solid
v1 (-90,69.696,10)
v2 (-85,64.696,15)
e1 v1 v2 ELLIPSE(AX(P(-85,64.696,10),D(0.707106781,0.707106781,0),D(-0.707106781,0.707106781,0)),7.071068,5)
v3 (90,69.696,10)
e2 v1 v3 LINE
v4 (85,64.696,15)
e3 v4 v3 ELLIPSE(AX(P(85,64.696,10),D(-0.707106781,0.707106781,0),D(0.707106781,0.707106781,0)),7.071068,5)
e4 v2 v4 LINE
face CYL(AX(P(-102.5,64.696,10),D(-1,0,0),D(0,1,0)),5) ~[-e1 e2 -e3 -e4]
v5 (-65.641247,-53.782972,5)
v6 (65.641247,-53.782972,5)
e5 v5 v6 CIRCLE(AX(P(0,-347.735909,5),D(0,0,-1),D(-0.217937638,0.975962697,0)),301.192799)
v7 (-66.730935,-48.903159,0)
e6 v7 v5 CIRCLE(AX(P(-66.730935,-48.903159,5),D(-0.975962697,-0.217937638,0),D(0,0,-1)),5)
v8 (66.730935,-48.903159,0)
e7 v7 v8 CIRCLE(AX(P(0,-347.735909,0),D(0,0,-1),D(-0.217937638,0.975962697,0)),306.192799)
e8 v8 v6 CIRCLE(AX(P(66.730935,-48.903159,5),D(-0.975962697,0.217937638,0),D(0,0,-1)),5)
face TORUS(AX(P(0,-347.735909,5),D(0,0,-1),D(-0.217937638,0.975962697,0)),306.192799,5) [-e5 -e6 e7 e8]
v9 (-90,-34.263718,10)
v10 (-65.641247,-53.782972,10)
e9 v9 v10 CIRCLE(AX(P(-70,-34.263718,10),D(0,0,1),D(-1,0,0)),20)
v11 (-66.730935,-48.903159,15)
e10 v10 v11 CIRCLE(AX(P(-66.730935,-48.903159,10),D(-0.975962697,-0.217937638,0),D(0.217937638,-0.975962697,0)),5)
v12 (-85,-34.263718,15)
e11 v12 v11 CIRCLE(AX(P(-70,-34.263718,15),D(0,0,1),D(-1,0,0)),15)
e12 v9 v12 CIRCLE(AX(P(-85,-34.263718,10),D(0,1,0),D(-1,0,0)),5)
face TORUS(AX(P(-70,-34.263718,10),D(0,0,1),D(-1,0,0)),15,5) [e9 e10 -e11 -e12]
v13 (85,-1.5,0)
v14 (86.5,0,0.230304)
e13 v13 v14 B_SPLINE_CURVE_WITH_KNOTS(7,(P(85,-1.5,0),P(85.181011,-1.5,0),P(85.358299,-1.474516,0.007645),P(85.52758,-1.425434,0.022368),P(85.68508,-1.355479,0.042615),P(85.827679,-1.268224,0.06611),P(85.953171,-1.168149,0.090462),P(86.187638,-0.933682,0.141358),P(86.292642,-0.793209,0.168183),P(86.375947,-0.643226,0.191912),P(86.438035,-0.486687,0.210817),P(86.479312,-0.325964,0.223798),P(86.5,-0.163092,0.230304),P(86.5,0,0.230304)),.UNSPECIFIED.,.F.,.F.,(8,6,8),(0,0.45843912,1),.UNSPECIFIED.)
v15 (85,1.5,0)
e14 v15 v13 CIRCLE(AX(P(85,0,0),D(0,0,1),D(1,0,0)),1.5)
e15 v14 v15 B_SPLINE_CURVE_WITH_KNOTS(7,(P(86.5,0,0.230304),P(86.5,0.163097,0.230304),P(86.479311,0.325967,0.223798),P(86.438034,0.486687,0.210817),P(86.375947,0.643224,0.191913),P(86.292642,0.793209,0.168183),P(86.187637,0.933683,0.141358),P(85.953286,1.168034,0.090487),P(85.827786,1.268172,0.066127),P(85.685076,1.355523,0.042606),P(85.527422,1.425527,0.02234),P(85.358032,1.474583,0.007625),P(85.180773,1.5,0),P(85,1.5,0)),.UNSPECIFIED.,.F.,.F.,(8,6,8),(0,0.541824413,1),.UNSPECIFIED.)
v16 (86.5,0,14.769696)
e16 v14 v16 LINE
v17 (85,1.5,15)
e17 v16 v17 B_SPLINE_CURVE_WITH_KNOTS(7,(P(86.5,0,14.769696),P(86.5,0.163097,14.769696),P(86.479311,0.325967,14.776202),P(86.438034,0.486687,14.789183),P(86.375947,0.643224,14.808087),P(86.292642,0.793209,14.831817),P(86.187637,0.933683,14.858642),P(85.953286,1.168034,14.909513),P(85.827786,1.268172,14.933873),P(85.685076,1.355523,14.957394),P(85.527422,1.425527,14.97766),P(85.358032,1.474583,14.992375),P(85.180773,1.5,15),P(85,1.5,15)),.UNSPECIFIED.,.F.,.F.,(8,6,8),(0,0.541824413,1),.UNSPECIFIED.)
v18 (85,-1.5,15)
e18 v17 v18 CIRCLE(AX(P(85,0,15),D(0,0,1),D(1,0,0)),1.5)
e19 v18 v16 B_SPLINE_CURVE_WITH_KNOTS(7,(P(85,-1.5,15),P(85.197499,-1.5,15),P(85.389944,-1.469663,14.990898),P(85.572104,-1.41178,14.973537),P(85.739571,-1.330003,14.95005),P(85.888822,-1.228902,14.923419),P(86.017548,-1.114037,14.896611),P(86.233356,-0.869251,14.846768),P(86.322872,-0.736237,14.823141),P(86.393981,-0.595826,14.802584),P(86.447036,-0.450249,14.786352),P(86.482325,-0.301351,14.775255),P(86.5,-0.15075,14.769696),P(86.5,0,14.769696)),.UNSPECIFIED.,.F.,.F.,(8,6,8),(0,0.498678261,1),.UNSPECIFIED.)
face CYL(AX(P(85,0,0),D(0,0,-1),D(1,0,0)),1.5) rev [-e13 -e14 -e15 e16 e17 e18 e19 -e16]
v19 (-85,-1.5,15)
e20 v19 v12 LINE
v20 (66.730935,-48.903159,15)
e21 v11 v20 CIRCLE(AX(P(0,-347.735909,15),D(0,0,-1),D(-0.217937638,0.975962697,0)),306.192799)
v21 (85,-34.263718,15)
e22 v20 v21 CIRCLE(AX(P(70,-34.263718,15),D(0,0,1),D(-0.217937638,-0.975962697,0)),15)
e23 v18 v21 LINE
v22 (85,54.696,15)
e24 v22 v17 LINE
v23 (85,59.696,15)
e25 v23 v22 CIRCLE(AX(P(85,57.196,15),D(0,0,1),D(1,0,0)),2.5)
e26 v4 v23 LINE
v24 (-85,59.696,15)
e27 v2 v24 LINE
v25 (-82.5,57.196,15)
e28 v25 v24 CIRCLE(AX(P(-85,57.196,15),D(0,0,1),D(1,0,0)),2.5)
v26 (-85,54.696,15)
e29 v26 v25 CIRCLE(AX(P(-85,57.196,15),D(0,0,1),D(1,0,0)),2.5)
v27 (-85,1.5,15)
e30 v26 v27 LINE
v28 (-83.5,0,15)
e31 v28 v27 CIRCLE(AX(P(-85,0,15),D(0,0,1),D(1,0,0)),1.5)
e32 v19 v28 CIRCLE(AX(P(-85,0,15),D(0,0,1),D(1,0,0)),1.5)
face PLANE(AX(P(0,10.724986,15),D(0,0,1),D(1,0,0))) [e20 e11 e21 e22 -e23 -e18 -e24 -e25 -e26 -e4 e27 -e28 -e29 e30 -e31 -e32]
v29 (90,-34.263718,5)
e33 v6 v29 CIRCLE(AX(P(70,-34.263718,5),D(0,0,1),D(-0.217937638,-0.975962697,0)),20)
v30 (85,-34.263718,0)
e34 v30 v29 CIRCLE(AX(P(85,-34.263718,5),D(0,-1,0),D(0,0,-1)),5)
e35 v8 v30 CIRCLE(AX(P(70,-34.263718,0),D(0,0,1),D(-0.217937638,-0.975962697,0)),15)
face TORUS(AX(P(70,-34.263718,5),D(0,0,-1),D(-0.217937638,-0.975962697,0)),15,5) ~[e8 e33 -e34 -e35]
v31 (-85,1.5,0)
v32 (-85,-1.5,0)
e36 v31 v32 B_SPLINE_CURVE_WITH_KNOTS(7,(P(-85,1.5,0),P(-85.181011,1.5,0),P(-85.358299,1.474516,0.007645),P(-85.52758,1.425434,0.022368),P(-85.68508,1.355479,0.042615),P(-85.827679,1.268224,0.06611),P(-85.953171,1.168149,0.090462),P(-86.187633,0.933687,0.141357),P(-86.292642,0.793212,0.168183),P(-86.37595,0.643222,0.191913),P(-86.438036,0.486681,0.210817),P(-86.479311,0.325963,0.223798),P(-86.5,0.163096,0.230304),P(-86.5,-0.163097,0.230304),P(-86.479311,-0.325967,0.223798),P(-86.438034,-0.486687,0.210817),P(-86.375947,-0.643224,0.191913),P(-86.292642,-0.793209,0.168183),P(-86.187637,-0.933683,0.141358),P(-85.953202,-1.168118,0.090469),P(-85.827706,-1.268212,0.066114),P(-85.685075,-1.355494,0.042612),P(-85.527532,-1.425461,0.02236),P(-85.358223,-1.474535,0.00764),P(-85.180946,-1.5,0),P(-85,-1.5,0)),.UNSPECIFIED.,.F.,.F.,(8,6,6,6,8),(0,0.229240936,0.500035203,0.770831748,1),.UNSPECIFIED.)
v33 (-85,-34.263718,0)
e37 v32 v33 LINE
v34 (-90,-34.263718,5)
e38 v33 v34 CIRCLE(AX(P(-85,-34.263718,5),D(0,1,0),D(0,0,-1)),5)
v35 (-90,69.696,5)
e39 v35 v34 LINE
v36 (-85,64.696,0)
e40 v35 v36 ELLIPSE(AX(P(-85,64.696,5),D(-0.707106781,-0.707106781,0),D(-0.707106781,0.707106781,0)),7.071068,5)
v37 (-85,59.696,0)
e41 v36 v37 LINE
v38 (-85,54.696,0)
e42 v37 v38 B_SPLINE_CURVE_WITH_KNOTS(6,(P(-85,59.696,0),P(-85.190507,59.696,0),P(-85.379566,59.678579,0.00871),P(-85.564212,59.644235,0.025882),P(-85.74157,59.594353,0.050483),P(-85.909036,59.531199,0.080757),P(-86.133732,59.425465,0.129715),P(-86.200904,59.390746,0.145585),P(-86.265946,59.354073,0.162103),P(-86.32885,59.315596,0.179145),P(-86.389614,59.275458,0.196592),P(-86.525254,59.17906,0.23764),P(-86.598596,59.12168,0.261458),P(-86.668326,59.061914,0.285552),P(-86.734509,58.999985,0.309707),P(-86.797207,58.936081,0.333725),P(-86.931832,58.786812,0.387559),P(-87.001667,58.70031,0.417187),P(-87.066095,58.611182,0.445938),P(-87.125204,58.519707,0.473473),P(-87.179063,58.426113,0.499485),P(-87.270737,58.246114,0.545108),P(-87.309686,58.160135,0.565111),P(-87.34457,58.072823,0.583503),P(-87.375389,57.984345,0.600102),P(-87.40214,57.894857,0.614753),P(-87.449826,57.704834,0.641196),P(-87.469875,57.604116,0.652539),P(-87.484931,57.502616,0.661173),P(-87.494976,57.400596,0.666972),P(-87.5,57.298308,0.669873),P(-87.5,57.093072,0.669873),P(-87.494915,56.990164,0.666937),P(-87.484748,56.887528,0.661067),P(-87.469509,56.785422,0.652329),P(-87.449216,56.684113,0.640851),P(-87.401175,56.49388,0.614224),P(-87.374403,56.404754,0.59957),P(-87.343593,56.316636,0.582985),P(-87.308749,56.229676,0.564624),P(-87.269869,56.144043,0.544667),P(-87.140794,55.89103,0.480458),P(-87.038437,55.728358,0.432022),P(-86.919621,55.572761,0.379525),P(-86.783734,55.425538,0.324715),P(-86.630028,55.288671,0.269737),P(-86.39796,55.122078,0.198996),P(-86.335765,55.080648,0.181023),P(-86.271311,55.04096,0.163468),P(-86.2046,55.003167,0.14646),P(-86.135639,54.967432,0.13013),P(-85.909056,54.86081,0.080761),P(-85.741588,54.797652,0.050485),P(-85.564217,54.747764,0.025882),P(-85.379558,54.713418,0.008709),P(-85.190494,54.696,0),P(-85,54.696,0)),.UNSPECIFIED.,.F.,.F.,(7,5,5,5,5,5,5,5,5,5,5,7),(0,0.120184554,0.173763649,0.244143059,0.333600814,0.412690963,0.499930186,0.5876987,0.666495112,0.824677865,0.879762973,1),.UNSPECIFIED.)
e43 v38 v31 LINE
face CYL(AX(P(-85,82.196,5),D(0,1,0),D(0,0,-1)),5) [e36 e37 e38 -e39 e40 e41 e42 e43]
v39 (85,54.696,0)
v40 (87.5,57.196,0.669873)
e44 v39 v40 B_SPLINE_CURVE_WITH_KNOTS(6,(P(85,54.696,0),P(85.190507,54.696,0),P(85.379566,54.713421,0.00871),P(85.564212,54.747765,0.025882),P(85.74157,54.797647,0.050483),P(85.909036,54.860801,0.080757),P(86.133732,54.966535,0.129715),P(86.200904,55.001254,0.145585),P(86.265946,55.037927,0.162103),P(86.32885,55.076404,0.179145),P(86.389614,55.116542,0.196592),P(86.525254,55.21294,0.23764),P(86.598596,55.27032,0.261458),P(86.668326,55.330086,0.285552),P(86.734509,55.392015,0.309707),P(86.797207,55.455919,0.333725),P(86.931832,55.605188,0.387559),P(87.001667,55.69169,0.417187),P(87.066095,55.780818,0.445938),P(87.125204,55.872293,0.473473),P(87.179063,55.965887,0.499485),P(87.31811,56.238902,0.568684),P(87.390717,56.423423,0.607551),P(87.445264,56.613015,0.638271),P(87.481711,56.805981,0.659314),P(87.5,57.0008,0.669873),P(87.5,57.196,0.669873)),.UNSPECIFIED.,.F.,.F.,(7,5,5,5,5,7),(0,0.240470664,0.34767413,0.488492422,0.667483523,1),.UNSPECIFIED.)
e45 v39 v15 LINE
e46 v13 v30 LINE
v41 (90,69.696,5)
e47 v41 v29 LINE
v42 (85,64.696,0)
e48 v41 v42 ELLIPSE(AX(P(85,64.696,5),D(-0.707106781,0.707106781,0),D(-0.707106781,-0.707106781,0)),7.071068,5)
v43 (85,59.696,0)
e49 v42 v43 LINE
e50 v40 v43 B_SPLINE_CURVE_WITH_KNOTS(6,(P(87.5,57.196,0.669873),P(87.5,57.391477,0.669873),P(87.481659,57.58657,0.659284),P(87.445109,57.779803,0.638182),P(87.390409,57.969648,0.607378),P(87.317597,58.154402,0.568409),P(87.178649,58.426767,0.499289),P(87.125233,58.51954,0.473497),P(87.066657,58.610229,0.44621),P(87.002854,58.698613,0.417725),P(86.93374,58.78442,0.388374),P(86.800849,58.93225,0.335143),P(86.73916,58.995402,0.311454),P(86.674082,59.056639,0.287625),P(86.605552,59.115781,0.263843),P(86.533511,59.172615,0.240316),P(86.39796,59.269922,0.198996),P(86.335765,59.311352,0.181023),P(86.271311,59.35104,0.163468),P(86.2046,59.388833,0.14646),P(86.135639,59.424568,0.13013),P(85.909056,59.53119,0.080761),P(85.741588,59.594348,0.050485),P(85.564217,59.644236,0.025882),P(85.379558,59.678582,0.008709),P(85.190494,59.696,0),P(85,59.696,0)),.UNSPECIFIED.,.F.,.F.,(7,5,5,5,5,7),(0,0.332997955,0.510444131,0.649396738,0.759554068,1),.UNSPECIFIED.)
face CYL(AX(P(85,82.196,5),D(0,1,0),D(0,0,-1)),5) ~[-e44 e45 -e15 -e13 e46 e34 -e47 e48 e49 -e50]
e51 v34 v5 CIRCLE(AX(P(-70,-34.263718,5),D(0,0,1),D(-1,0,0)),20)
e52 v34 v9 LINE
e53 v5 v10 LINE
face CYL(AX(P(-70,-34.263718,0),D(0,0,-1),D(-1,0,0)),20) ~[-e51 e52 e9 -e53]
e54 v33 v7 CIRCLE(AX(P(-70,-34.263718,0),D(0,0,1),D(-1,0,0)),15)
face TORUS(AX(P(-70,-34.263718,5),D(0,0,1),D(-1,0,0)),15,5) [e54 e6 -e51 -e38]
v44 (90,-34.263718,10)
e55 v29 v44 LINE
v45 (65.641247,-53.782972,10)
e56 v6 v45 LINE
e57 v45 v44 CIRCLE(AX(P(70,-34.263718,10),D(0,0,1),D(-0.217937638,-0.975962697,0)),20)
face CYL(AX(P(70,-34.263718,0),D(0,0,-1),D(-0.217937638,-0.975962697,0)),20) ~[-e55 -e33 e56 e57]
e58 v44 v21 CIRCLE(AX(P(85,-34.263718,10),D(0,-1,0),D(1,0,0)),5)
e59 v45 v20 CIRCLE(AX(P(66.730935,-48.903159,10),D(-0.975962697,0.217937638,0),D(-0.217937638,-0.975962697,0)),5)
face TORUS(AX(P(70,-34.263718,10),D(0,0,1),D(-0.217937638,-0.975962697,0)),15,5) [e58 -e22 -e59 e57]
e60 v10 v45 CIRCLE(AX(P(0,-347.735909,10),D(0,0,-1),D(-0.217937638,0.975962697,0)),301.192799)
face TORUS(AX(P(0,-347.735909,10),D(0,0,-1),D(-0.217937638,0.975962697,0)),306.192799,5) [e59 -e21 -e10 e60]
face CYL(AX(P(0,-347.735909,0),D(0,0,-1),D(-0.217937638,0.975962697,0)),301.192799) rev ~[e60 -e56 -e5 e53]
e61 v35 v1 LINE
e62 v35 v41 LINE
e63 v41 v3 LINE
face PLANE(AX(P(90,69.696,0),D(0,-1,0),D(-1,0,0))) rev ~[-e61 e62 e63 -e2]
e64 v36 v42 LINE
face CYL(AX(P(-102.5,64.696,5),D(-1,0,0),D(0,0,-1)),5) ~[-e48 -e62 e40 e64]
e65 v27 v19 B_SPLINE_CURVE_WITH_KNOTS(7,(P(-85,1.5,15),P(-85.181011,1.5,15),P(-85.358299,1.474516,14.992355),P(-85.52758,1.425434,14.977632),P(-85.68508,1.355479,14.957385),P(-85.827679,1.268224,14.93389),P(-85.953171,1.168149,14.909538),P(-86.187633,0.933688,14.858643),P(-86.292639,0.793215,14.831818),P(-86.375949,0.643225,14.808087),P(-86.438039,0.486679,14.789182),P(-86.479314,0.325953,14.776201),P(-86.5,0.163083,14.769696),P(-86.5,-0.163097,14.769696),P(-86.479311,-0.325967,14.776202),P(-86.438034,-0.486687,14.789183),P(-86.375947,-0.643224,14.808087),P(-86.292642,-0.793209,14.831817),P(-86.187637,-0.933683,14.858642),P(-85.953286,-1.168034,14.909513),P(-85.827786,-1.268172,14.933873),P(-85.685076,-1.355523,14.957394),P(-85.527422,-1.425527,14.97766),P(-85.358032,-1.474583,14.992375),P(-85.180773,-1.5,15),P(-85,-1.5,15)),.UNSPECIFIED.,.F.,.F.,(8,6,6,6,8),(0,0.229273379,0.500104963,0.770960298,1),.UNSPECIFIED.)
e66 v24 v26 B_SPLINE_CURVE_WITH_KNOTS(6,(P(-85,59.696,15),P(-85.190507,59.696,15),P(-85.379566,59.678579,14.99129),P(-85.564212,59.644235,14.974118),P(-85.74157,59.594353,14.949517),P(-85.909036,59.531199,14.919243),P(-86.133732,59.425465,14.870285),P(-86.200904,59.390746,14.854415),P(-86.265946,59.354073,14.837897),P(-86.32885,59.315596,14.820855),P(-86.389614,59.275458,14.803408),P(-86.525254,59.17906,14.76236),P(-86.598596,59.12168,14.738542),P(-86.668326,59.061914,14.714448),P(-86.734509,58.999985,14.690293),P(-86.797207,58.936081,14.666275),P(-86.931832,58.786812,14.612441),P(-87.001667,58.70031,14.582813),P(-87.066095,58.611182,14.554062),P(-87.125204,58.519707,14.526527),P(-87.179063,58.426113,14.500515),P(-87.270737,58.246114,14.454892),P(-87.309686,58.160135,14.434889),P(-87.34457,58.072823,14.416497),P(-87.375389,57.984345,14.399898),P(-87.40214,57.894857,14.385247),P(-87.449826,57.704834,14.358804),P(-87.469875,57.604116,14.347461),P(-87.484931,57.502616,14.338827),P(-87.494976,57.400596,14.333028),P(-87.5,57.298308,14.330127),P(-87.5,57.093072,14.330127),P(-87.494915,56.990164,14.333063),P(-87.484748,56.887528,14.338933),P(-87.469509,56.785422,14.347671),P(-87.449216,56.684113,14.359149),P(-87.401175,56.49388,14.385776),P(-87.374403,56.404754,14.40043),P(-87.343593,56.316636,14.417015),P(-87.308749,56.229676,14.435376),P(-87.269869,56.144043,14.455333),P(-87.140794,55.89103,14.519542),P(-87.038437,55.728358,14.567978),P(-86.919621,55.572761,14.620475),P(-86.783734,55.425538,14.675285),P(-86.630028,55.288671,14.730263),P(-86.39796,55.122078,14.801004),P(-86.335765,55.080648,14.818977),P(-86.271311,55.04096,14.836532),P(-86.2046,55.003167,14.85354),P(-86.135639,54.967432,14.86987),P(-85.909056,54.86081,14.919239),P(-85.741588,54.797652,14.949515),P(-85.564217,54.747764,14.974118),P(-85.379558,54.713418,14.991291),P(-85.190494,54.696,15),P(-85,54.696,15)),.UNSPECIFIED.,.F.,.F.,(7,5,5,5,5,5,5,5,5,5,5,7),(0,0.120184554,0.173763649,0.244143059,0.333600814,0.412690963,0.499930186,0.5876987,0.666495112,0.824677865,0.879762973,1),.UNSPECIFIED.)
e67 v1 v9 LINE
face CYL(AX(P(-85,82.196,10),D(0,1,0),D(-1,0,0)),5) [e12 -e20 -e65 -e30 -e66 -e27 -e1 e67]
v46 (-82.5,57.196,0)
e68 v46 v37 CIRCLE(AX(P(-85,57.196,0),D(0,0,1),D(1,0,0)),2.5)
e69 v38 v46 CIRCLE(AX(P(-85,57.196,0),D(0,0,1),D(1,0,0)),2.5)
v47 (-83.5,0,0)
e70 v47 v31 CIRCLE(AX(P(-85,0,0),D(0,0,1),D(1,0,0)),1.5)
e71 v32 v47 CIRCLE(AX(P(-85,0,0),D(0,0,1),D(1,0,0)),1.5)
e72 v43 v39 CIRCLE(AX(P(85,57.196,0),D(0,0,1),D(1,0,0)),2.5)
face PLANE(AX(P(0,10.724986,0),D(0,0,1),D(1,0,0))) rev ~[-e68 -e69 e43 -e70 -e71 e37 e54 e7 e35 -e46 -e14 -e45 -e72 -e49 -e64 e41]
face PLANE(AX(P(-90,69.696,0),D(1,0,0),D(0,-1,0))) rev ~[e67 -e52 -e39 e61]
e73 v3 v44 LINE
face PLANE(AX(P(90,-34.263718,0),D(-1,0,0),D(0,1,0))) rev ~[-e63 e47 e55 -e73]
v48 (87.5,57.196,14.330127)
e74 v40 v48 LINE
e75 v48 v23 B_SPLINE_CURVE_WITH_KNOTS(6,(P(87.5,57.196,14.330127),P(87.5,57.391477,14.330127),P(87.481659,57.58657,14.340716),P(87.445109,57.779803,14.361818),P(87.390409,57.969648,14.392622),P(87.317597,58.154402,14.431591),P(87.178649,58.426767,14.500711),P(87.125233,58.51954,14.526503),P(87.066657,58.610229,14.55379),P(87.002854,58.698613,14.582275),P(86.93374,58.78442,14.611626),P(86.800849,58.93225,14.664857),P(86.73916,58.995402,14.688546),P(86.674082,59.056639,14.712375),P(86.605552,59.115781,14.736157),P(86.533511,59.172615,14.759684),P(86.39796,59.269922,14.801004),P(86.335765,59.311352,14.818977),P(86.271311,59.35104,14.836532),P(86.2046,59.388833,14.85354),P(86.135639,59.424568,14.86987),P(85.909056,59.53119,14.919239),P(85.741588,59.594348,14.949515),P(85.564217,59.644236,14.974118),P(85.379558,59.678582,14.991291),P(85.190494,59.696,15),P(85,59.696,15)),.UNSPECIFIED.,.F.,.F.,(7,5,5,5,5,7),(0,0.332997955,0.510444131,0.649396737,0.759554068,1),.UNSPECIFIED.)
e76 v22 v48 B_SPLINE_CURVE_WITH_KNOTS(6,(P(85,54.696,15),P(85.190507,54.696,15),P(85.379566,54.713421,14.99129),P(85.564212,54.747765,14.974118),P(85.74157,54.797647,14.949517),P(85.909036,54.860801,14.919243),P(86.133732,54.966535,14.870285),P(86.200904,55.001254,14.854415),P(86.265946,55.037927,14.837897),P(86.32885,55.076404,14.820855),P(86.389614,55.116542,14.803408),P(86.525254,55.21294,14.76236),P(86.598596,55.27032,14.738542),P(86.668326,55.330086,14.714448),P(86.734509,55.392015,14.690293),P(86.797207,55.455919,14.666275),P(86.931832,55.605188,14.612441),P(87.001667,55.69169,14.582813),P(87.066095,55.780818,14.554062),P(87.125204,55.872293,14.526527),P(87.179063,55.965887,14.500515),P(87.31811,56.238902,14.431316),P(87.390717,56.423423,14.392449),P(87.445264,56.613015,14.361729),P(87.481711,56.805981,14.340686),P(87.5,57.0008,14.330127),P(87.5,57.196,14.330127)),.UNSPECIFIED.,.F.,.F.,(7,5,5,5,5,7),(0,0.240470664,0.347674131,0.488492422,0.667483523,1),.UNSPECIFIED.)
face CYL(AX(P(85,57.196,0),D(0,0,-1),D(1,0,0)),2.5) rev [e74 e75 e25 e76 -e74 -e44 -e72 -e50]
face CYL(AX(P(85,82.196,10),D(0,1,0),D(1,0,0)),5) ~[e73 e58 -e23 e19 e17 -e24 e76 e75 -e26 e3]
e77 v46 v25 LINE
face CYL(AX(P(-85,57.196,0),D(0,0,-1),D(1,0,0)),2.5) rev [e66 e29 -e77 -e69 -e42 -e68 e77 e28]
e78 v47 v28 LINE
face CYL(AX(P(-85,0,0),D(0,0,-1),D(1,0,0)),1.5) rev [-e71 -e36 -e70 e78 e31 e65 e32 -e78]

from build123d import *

# Parameters (mm, degrees)
F0_R         = 1.5
F0_R_2       = 2.5
F1_DEPTH     = 15
F2_T1_DEPTH  = 116.4597183962
F2_T3_DEPTH  = 205
F2_T6_ANGLE  = 102.5879293722
F2_T8_ANGLE  = 25.1758587444
F2_T10_ANGLE = 102.5879293722
F3_T1_DEPTH  = 205
F3_T3_DEPTH  = 116.4597183962
F3_T6_ANGLE  = 102.5879293722
F3_T8_ANGLE  = 25.1758587444
F3_T10_ANGLE = 102.5879293722


# Not quite as in the source:
# - a fillet or chamfer that OpenCascade refuses, or shapes differently, is made with other operations: its cross-section is extruded or revolved along the edge and cut away or added


with BuildPart() as f1:
    # F0 (on Top) → F1 (new body)
    with BuildSketch(Plane.XY):
        with BuildLine():
            Line((90, 69.696), (-90, 69.696))
            Line((-90, 69.696), (-90, -34.2637183962))
            ThreePointArc((-90, -34.2637183962), (-82.5064972072, -49.8710092439), (-65.6412472394, -53.7829723362))
            ThreePointArc((-65.6412472394, -53.7829723362), (0, -46.5431097607), (65.6412472394, -53.7829723362))
            ThreePointArc((65.6412472394, -53.7829723362), (82.5064972072, -49.8710092439), (90, -34.2637183962))
            Line((90, -34.2637183962), (90, 69.696))
        make_face()
        with Locations((-85, 0)):
            Circle(F0_R, mode=Mode.SUBTRACT)
        with Locations((85, 0)):
            Circle(F0_R, mode=Mode.SUBTRACT)
        with Locations((-85, 57.196)):
            Circle(F0_R_2, mode=Mode.SUBTRACT)
        with Locations((85, 57.196)):
            Circle(F0_R_2, mode=Mode.SUBTRACT)
    extrude(amount=F1_DEPTH)

    # F2: fillet of radius 5 on 2 edges, made by hand

    # F2_s2 → F2_t1 (cut)
    with BuildSketch(Plane.XZ.offset(-82.196)):
        with BuildLine():
            ThreePointArc((-90, 10), (-88.5355339059, 13.5355339059), (-85, 15))
            Line((-85, 15), (-90, 15))
            Line((-90, 15), (-90, 10))
        make_face()
        with BuildLine():
            ThreePointArc((90, 10), (88.5355339059, 13.5355339059), (85, 15))
            Line((85, 15), (90, 15))
            Line((90, 15), (90, 10))
        make_face()
    extrude(amount=F2_T1_DEPTH, mode=Mode.SUBTRACT)

    # F2_s4 → F2_t3 (cut)
    with BuildSketch(Plane.YZ.offset(-102.5)):
        with BuildLine():
            ThreePointArc((69.696, 10), (68.2315339059, 13.5355339059), (64.696, 15))
            Line((64.696, 15), (69.696, 15))
            Line((69.696, 15), (69.696, 10))
        make_face()
    extrude(amount=F2_T3_DEPTH, mode=Mode.SUBTRACT)

    # F2_s5 → F2_t6 (revolve, cut)
    with BuildSketch(Plane.XZ.offset(34.2637183962)):
        with BuildLine():
            ThreePointArc((-90, 10), (-88.5355339059, 13.5355339059), (-85, 15))
            Line((-85, 15), (-90, 15))
            Line((-90, 15), (-90, 10))
        make_face()
    revolve(axis=Axis((-70, -34.2637183962, 15), (0, 0, 1)), revolution_arc=F2_T6_ANGLE, mode=Mode.SUBTRACT)

    # F2_s7 → F2_t8 (revolve, cut)
    with BuildSketch(Plane(origin=(-73.9630818252, -16.5163478111, 0), x_dir=(0, 0, 1), z_dir=(-0.975962697, -0.217937638, 0))):
        with BuildLine():
            ThreePointArc((10, -38.1844763532), (13.5355339059, -36.7200102591), (15, -33.1844763532))
            Line((15, -33.1844763532), (15, -38.1844763532))
            Line((15, -38.1844763532), (10, -38.1844763532))
        make_face()
    revolve(axis=Axis((0, -347.7359089185, 15), (0, 0, -1)), revolution_arc=F2_T8_ANGLE, mode=Mode.SUBTRACT)

    # F2_s9 → F2_t10 (revolve, cut)
    with BuildSketch(Plane(origin=(73.9630818252, -16.5163478111, 0), x_dir=(0, 0, 1), z_dir=(-0.975962697, 0.217937638, 0))):
        with BuildLine():
            ThreePointArc((10, -38.1844763532), (13.5355339059, -36.7200102591), (15, -33.1844763532))
            Line((15, -33.1844763532), (15, -38.1844763532))
            Line((15, -38.1844763532), (10, -38.1844763532))
        make_face()
    revolve(axis=Axis((70, -34.2637183962, 15), (0, 0, 1)), revolution_arc=F2_T10_ANGLE, mode=Mode.SUBTRACT)

    # F3: fillet of radius 5 on 2 edges, made by hand

    # F3_s2 → F3_t1 (cut)
    with BuildSketch(Plane.YZ.offset(-102.5)):
        with BuildLine():
            ThreePointArc((64.696, 0), (68.2315339059, 1.4644660941), (69.696, 5))
            Line((69.696, 5), (69.696, 0))
            Line((69.696, 0), (64.696, 0))
        make_face()
    extrude(amount=F3_T1_DEPTH, mode=Mode.SUBTRACT)

    # F3_s4 → F3_t3 (cut)
    with BuildSketch(Plane.XZ.offset(-82.196)):
        with BuildLine():
            ThreePointArc((-85, 0), (-88.5355339059, 1.4644660941), (-90, 5))
            Line((-90, 5), (-90, 0))
            Line((-90, 0), (-85, 0))
        make_face()
        with BuildLine():
            ThreePointArc((85, 0), (88.5355339059, 1.4644660941), (90, 5))
            Line((90, 5), (90, 0))
            Line((90, 0), (85, 0))
        make_face()
    extrude(amount=F3_T3_DEPTH, mode=Mode.SUBTRACT)

    # F3_s5 → F3_t6 (revolve, cut)
    with BuildSketch(Plane.XZ.offset(34.2637183962)):
        with BuildLine():
            ThreePointArc((-85, 0), (-88.5355339059, 1.4644660941), (-90, 5))
            Line((-90, 5), (-90, 0))
            Line((-90, 0), (-85, 0))
        make_face()
    revolve(axis=Axis((-70, -34.2637183962, 0), (0, 0, 1)), revolution_arc=F3_T6_ANGLE, mode=Mode.SUBTRACT)

    # F3_s7 → F3_t8 (revolve, cut)
    with BuildSketch(Plane(origin=(-73.9630818252, -16.5163478111, 0), x_dir=(0, 0, 1), z_dir=(-0.975962697, -0.217937638, 0))):
        with BuildLine():
            ThreePointArc((0, -33.1844763532), (1.4644660941, -36.7200102591), (5, -38.1844763532))
            Line((5, -38.1844763532), (0, -38.1844763532))
            Line((0, -38.1844763532), (0, -33.1844763532))
        make_face()
    revolve(axis=Axis((0, -347.7359089185, 0), (0, 0, -1)), revolution_arc=F3_T8_ANGLE, mode=Mode.SUBTRACT)

    # F3_s9 → F3_t10 (revolve, cut)
    with BuildSketch(Plane(origin=(73.9630818252, -16.5163478111, 0), x_dir=(0, 0, 1), z_dir=(-0.975962697, 0.217937638, 0))):
        with BuildLine():
            ThreePointArc((5, -38.1844763532), (1.4644660941, -36.7200102591), (0, -33.1844763532))
            Line((0, -33.1844763532), (0, -38.1844763532))
            Line((0, -38.1844763532), (5, -38.1844763532))
        make_face()
    revolve(axis=Axis((70, -34.2637183962, 0), (0, 0, 1)), revolution_arc=F3_T10_ANGLE, mode=Mode.SUBTRACT)


solid = f1.part
